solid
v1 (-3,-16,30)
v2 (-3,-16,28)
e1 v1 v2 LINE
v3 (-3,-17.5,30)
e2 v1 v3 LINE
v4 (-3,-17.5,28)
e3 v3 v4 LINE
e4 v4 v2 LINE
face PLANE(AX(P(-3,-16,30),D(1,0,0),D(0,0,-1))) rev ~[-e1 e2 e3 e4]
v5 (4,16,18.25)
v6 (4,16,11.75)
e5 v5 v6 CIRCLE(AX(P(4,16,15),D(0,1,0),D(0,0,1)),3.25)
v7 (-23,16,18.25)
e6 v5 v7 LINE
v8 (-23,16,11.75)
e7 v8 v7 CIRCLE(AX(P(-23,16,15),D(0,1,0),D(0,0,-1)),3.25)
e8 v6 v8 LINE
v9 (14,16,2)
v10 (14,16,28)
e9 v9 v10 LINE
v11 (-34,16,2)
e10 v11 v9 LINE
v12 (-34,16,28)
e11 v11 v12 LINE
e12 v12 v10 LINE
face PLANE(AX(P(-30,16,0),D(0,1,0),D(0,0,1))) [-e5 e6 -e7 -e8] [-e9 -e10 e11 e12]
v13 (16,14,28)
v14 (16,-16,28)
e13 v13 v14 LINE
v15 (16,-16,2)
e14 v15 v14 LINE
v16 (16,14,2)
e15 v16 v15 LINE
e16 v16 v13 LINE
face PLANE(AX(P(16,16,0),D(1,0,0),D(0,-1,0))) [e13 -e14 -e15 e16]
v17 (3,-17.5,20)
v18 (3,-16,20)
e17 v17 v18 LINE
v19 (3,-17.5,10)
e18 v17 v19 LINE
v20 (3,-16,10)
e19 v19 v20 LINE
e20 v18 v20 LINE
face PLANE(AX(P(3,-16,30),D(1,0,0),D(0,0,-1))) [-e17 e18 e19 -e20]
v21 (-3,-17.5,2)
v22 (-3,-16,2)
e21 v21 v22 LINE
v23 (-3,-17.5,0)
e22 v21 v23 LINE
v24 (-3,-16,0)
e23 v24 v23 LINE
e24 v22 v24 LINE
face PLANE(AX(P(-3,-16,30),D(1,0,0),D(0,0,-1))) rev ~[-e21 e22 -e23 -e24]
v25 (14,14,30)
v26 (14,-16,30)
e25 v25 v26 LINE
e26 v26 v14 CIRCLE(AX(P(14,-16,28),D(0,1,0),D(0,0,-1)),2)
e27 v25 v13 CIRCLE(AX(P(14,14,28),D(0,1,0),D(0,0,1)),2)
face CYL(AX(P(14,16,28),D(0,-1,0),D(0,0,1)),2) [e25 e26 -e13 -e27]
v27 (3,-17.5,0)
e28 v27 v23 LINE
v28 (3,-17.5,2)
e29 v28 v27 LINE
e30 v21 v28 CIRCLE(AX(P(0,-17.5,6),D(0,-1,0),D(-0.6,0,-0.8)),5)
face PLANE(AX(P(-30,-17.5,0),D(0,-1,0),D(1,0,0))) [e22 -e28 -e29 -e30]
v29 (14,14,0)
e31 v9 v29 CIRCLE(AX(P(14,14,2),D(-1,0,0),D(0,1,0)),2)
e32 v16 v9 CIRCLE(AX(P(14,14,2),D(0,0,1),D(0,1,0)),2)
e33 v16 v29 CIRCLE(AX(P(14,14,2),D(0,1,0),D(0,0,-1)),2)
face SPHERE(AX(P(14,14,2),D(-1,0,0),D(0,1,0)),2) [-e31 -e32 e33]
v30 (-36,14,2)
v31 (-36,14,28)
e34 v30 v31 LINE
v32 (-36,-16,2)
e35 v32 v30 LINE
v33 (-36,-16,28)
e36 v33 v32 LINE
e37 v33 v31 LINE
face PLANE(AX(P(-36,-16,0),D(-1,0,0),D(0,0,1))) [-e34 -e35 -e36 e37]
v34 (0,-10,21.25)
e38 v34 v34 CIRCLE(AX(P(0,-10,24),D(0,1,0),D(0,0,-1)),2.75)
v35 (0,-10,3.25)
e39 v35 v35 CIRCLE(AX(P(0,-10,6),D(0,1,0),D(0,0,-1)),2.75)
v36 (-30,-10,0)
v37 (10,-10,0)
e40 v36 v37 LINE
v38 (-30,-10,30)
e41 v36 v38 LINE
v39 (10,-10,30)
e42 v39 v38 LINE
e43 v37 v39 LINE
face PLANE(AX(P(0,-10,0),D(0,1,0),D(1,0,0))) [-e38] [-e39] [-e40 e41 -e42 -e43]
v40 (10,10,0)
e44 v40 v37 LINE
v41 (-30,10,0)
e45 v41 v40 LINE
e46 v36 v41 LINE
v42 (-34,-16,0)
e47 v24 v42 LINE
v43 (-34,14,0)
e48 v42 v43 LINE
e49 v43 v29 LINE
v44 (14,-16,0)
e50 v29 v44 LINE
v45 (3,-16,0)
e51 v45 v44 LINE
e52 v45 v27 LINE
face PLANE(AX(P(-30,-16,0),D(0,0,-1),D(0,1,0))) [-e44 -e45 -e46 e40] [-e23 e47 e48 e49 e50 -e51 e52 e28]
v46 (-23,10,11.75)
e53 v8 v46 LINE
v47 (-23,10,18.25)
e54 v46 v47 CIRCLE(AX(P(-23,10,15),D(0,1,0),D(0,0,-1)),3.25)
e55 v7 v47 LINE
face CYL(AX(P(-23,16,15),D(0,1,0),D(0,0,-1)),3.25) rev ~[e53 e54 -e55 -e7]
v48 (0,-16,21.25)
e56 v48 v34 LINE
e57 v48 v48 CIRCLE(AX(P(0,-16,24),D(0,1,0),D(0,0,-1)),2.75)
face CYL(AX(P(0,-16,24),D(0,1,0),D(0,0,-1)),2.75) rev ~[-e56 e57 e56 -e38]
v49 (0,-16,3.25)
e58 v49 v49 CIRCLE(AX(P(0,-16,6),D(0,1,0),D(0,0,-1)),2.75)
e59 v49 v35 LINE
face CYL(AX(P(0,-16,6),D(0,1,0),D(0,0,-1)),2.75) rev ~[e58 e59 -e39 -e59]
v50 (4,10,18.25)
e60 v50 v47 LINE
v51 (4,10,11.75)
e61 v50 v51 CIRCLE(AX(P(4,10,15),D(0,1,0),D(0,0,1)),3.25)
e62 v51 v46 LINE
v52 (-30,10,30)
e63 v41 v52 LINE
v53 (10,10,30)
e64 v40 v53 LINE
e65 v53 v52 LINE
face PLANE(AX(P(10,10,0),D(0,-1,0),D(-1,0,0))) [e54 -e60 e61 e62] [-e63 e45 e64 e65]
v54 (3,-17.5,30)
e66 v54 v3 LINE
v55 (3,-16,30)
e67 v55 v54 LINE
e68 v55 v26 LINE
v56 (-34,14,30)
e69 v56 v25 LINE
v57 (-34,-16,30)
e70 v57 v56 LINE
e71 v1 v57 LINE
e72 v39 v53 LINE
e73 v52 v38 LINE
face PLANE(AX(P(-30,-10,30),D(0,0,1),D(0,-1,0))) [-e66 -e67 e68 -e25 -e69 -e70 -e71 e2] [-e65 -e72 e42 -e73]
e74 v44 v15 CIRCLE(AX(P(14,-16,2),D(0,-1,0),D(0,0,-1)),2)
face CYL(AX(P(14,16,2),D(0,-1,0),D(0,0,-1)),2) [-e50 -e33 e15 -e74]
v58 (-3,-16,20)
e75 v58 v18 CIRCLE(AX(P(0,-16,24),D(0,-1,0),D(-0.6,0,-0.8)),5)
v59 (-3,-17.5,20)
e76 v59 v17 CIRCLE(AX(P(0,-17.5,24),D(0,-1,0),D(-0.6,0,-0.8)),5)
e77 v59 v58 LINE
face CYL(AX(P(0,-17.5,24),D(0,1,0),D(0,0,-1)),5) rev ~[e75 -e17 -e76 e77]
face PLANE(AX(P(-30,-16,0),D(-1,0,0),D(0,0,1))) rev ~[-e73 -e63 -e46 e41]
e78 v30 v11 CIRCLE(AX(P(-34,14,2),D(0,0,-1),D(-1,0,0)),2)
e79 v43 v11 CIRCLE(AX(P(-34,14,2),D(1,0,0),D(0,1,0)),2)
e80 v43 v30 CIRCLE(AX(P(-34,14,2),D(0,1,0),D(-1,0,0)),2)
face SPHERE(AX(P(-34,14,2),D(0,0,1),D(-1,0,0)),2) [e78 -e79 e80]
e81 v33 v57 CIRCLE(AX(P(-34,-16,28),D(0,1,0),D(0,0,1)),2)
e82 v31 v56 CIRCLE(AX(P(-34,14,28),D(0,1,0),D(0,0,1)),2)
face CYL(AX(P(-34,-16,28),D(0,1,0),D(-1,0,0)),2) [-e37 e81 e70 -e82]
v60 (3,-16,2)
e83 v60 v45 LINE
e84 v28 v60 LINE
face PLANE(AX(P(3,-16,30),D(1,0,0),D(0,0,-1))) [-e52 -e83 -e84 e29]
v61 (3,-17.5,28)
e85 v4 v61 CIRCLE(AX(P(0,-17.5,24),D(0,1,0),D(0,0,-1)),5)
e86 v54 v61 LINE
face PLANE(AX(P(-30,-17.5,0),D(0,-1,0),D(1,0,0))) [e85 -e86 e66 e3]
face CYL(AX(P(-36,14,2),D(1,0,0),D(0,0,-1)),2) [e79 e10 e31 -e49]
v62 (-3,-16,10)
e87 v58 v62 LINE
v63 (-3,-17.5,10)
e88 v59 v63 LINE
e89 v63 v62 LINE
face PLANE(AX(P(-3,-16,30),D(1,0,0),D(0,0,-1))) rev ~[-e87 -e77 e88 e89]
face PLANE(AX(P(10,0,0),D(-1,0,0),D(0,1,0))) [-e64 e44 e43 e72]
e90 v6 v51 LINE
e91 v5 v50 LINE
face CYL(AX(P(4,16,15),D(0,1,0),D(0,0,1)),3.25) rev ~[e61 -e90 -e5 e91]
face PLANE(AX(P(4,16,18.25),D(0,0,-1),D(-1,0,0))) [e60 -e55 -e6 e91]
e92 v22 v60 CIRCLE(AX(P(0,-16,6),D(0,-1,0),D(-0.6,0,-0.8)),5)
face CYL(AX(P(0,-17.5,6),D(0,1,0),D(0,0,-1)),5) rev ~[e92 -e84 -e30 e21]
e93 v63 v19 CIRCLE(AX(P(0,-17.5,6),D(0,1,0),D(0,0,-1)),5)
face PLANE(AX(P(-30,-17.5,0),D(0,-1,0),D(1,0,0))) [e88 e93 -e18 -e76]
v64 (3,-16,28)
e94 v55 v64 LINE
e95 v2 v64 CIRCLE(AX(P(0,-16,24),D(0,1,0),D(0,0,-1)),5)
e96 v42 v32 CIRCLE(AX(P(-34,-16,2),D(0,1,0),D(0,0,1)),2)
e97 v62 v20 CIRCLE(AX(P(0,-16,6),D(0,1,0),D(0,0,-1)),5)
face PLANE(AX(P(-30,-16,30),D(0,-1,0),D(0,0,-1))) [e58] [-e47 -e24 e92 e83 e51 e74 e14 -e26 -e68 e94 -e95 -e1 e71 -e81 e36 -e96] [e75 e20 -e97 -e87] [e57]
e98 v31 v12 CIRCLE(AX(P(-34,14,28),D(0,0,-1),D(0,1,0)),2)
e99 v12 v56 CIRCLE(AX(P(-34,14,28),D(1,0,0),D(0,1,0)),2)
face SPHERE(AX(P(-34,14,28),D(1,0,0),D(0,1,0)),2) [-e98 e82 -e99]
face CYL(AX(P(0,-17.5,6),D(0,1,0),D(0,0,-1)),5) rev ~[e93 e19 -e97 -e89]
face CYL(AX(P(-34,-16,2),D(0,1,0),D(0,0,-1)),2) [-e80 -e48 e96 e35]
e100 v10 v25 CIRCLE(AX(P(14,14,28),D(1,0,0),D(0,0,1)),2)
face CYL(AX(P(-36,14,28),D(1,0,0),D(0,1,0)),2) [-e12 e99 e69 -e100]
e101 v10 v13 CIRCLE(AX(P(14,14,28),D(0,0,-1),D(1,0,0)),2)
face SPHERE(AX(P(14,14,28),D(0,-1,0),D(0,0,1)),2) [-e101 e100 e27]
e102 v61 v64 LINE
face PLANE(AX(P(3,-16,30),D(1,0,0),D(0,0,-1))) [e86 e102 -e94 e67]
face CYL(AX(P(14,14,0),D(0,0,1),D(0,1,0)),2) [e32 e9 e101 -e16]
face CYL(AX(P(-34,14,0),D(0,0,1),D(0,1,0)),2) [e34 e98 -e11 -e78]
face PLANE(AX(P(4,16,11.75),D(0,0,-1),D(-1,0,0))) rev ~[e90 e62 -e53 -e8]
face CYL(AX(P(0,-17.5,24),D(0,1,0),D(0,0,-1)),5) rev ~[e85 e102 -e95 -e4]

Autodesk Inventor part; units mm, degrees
ref_plane "YZ Plane" through (0, 0, 0) normal (1, 0, 0) x (0, 1, 0)
ref_plane "XZ Plane" through (0, 0, 0) normal (0, 1, 0) x (-1, 0, 0)
ref_plane "XY Plane" through (0, 0, 0) normal (0, 0, 1) x (1, 0, 0)
sketch "Sketch1" plane through (0, 0, 0) normal (0, 0, 1) x (1, 0, 0)
  line L0 (-12.2491, 0) -> (12.2491, 0)
  line L1 (0, 10.917) -> (0, -10.917)
  line L2 (-30, -10) -> (-30, -16)
  line L3 (-30, -16) -> (16, -16)
  line L4 (-30, -10) -> (10, -10)
  line L5 (10, -10) -> (10, 10)
  line L6 (10, 10) -> (-30, 10)
  line L7 (-30, 10) -> (-30, 16)
  line L8 (-30, 16) -> (16, 16)
  line L9 (16, 16) -> (16, -16)
  point P0 (0, 0)
  point P1 (0, 0)
  dimension "d0" = 10
  dimension "d1" = 10
  dimension "d2" = 10
  dimension "d3" = 30
  dimension "d4" = 6
  dimension "d5" = 6
  dimension "d6" = 40
  dimension "d7" = 6
extrude "Extrusion1" add sketch "Sketch1" along normal blind 30 contours L5 L6 L7 L8 L9 L3 L2 L4
sketch "Sketch2" plane through (-30, -16, 0) normal (0, -1, 0) x (1, 0, 0)
  line L0 (40, 30) -> (0, 30) projected
  line L1 (27, 30) -> (27, 0)
  line L2 (0, 0) -> (0, 30) projected
  line L3 (33, 30) -> (33, 0)
  line L4 (40, 0) -> (0, 0) projected
  line L5 (27, 30) -> (33, 30)
  line L6 (33, 0) -> (27, 0)
  line L7 (46, 0) -> (46, 30) projected
  line L8 (40, 0) -> (40, 30) projected
  point P0 (30, 0)
  dimension "d37" = 13
  dimension "d38" = 7
extrude "Extrusion2" add sketch "Sketch2" along normal blind 1.5 contours L3 L4 L1 L0
sketch "Sketch3" plane through (-30, -17.5, 0) normal (0, -1, 0) x (1, 0, 0)
  line L0 (27, 0) -> (33, 0) projected
  line L1 (27, 30) -> (27, 0) projected
  line L2 (27, 15) -> (13, 15)
  line L3 (33, 0) -> (33, 30) projected
  point P0 (30, 0)
  point P1 (30, 6)
  point P2 (30, 24)
  dimension "d14" = 6
  dimension "d36" = 3
hole "Hole1" at (0, -17.5, 6) at (0, -17.5, 24) direction (0, 1, 0) diameter 5.5 end up to surface counterbore diameter 10 counterbore depth 1.5
sketch "Sketch4" plane through (-30, 16, 0) normal (0, 1, 0) x (1, 0, 0)
  arc A0 (7, -11.75) -> (7, -18.25) centre (7, -15) ccw
  line L0 (0, 0) -> (0, -30) projected
  line L1 (46, 0) -> (0, 0) projected
  arc A1 (34, -18.25) -> (34, -11.75) centre (34, -15) ccw
  line L2 (46, -30) -> (0, -30) projected
  line L3 (34, -11.75) -> (7, -11.75)
  line L4 (34, -18.25) -> (7, -18.25)
  point P0 (30, 0)
  dimension "d22" = 6.5
  dimension "d23" = 7
  dimension "d24" = 15
  dimension "d25" = 6.5
  dimension "d26" = 34
  dimension "d27" = 15
extrude "Extrusion3" cut sketch "Sketch4" against normal up to surface (6 mm away)
sketch "Sketch5" plane through (-30, -16, 0) normal (-1, 0, 0) x (0, 0, 1)
  line L0 (0, 0) -> (0, 32) projected
  line L1 (30, 6) -> (30, 0) projected
  line L2 (0, 32) -> (30, 32)
  line L3 (30, 32) -> (30, 0)
  line L4 (30, 0) -> (0, 0)
  line L5 (0, 0) -> (0, 32)
  point P0 (0, 16)
extrude "Extrusion4" add sketch "Sketch5" along normal blind 6
fillet "Fillet3" radius 2 8 edges at (16, 0, 30) (-10, 16, 30) (-36, 16, 15) (-36, 0, 30) (-36, 0, 0) (-10, 16, 0) (16, 16, 15) (16, 0, 0)
properties part number "Estrutura - Suporte Mesa"
